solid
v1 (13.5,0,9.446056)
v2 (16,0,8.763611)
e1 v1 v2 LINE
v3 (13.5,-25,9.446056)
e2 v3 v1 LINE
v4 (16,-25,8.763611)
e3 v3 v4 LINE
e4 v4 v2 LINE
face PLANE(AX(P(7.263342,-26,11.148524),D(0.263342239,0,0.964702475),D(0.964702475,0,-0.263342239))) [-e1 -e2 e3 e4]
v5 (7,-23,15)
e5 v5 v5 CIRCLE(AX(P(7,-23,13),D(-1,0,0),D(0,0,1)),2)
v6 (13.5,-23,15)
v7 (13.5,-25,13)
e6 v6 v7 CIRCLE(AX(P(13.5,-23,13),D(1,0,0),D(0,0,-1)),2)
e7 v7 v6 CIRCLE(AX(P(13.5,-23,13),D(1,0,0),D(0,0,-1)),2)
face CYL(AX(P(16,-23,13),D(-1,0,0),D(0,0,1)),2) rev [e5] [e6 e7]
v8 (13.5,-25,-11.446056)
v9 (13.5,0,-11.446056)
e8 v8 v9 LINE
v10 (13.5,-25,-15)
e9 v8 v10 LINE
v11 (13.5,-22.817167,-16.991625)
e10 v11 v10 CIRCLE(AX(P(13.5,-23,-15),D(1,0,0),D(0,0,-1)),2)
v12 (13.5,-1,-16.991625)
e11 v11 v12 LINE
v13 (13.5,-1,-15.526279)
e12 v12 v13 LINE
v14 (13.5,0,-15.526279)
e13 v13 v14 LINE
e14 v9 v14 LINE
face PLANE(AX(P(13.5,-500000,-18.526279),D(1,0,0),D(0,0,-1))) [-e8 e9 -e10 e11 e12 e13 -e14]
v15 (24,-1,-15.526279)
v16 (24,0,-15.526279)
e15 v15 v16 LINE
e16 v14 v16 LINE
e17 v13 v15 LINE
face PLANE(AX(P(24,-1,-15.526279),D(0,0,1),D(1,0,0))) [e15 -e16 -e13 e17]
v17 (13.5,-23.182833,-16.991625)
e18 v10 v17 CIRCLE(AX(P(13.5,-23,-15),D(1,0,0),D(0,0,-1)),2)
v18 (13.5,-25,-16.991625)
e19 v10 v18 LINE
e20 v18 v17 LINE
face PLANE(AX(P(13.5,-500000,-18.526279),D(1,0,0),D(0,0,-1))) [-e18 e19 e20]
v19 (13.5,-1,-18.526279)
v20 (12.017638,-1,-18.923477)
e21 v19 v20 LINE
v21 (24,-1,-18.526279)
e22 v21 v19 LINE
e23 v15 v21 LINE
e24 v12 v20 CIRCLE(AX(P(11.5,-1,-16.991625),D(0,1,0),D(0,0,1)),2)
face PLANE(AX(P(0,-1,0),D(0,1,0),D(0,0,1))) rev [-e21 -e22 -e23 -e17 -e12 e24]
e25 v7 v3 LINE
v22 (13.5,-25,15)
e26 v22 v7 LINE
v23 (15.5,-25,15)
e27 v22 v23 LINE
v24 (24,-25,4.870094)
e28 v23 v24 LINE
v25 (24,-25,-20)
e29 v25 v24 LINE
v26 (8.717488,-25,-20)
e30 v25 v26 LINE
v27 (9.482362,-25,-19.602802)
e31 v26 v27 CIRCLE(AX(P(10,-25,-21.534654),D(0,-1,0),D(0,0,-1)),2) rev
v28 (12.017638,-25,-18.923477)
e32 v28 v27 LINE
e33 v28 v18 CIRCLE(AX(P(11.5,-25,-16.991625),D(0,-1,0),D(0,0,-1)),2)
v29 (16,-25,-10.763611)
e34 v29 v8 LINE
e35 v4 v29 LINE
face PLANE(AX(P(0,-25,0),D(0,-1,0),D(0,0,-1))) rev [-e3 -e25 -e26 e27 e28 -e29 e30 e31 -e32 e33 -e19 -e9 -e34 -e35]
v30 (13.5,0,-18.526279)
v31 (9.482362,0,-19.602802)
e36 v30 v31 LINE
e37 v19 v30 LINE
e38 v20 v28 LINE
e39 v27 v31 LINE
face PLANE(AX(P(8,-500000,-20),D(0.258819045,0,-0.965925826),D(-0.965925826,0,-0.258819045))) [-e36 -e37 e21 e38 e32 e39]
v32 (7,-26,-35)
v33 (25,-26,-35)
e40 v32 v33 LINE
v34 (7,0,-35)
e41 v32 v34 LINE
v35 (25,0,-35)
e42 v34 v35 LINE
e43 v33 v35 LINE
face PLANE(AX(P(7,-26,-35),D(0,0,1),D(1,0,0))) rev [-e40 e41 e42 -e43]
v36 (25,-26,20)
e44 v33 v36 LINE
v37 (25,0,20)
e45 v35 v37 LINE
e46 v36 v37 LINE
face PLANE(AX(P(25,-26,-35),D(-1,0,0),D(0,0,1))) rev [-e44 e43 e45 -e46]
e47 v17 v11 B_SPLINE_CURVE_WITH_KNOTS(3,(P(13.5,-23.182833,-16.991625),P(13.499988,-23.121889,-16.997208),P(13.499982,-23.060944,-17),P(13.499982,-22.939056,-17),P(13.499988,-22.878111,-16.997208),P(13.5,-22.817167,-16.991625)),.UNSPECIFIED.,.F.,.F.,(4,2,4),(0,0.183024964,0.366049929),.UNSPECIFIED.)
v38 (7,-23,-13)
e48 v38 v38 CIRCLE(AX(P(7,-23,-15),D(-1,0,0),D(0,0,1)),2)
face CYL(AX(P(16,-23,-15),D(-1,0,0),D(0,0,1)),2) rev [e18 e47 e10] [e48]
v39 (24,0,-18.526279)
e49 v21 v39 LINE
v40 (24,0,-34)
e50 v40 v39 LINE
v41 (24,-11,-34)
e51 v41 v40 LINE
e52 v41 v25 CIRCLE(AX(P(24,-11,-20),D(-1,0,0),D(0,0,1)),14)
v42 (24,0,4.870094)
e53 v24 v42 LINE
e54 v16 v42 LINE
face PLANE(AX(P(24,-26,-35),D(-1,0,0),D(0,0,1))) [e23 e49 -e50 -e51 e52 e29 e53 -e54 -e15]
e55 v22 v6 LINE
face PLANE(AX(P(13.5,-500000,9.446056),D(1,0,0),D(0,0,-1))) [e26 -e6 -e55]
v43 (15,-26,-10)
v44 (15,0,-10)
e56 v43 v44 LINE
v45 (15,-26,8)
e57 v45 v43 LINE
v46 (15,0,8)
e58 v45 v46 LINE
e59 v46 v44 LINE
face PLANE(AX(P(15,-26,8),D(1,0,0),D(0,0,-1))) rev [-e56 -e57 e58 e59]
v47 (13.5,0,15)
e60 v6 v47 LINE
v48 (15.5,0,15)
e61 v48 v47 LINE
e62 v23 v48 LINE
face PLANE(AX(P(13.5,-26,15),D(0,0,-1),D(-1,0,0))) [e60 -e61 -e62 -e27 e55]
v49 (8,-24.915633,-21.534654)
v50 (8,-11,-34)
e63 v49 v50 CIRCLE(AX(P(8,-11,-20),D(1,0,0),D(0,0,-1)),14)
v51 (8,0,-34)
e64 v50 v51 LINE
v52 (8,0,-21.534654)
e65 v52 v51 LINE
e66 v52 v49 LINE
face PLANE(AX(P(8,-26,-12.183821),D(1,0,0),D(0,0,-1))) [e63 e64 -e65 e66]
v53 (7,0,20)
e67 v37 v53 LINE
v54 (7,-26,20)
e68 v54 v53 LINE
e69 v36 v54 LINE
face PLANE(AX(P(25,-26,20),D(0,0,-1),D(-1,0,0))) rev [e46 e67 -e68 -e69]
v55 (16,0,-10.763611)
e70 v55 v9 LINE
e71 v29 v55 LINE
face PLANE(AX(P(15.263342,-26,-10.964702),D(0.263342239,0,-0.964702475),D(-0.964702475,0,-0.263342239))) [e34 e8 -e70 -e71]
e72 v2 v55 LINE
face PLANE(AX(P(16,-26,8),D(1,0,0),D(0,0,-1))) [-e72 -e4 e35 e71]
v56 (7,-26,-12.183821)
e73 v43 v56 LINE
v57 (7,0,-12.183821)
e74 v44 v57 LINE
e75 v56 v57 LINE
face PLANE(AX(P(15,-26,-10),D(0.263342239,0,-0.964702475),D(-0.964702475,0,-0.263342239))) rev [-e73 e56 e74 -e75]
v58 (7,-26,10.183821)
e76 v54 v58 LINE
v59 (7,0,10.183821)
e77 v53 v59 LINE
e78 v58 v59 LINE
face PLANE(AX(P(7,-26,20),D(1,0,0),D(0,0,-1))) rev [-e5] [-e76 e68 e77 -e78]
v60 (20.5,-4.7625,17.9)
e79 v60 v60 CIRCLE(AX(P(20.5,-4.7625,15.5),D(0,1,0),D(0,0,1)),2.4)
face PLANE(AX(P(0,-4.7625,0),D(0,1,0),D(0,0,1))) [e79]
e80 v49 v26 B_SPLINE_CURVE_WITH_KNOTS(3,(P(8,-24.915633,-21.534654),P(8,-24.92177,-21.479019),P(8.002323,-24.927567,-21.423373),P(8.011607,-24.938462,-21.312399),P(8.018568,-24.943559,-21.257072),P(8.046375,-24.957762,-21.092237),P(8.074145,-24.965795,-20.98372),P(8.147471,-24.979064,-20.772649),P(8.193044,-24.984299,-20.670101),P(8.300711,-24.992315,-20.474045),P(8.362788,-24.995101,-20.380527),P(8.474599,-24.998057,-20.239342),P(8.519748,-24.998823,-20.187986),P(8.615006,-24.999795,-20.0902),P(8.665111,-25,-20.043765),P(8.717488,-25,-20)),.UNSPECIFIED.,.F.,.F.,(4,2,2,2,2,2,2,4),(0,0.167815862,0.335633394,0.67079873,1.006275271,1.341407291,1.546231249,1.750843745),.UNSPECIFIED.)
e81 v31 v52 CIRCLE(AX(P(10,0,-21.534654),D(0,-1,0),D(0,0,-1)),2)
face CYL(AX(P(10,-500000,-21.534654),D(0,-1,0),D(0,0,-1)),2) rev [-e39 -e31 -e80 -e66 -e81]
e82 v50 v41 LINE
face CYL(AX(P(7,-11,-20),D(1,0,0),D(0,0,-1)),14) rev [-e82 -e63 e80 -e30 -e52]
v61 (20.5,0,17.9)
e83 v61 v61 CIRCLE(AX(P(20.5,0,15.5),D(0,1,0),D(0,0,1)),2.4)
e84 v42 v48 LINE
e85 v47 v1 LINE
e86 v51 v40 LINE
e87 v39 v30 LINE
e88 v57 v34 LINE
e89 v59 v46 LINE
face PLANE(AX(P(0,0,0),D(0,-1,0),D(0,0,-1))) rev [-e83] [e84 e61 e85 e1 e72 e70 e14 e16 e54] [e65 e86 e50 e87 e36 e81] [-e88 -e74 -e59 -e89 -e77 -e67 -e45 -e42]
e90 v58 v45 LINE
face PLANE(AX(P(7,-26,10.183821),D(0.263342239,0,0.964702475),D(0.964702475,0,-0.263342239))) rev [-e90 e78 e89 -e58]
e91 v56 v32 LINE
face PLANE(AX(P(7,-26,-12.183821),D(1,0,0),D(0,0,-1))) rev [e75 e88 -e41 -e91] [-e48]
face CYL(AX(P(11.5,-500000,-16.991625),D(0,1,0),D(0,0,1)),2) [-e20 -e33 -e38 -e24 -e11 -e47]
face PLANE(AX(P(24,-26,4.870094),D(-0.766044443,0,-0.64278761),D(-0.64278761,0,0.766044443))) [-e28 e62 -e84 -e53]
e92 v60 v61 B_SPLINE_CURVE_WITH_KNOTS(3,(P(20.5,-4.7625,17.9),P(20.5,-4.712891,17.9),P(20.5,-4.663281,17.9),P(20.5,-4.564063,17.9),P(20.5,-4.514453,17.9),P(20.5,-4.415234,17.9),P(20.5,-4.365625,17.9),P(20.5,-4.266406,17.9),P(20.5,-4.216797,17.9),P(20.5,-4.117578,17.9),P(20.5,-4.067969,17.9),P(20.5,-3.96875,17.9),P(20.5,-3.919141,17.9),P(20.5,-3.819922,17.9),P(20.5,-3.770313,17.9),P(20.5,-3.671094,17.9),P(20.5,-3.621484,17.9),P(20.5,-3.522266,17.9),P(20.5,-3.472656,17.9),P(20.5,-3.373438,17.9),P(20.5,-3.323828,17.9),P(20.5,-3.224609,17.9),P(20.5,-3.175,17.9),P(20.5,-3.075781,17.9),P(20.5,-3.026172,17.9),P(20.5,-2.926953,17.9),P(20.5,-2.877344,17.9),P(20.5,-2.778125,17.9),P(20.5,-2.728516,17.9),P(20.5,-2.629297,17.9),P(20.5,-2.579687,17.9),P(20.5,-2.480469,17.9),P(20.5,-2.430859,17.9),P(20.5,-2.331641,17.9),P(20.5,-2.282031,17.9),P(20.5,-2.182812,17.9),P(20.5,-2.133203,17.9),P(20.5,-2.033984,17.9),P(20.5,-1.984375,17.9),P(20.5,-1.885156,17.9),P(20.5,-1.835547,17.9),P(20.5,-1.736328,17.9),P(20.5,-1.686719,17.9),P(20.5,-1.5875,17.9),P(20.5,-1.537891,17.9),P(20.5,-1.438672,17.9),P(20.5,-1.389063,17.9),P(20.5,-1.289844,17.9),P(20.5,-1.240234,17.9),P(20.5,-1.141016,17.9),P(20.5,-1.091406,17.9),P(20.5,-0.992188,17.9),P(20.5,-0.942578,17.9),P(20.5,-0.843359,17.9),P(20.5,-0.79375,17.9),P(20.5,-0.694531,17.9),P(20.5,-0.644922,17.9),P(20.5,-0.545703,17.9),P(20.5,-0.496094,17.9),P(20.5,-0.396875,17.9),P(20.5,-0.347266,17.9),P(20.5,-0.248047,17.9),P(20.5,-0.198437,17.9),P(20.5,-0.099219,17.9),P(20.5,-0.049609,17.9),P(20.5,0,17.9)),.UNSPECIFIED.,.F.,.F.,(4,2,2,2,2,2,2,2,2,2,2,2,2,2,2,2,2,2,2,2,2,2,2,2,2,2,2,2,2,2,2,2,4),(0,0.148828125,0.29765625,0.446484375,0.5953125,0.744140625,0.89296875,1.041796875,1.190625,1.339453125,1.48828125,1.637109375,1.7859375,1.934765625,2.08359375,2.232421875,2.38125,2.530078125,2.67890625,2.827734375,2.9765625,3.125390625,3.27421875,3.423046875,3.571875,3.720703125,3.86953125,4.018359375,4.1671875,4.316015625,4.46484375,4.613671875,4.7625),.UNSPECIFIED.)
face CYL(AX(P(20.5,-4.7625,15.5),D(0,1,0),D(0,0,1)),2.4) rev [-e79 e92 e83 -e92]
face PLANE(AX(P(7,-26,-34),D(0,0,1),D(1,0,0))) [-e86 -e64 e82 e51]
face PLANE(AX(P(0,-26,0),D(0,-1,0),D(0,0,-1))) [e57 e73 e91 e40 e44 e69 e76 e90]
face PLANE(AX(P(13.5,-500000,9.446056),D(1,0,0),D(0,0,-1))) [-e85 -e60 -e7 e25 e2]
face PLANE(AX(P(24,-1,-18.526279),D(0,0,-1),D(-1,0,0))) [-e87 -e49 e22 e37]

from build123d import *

# Parameters (mm, degrees)
BOSS_EXTRUDE2_DEPTH = 26
SHELL1_T            = -1
FILLET1_R           = 14
BOSS_EXTRUDE3_REACH = 52.259
FILLET2_R           = 14
SKETCH8_W           = 10.5
SKETCH8_H           = 3
BOSS_EXTRUDE4_DEPTH = 1
SKETCH4_R           = 2
CUT_EXTRUDE1_DEPTH  = 9
BOSS_EXTRUDE5_REACH = 52.259
SKETCH7_R           = 2.4
CUT_EXTRUDE2_DEPTH  = 4.7625
FILLET5_R           = 2


with BuildPart() as part:
    # Sketch2 → Boss-Extrude2 (new body)
    with BuildSketch(Plane.XZ):
        Polygon((7, -12.183821406), (7, -35), (25, -35), (25, 20), (7, 20), (7, 10.183821406), (15, 8), (15, -10), align=None)
    extrude(amount=BOSS_EXTRUDE2_DEPTH)

    # Shell1
    shell1_openings = [part.faces().sort_by_distance(p)[0] for p in [
        (17.00255576, 0, -8.766773004),
    ]]
    offset(amount=SHELL1_T, openings=shell1_openings, kind=Kind.INTERSECTION)

    # Fillet1
    fillet1_edges = [part.edges().sort_by_distance(p)[0] for p in [
        (16, -25, -34),
    ]]
    fillet(fillet1_edges, radius=FILLET1_R)

    # Sketch3 → Boss-Extrude3 (add, up to next)
    with BuildSketch(Plane(origin=(0, 0, 0), x_dir=(1, 0, 0), z_dir=(0, 1, 0)), mode=Mode.PRIVATE) as boss_extrude3_sk1:
        Polygon((13.5, 11.446055541), (8, 12.947432757), (8, 20), (13.5, 18.526279442), align=None)
    boss_extrude3_tool1 = extrude(boss_extrude3_sk1.sketch, amount=-BOSS_EXTRUDE3_REACH, mode=Mode.PRIVATE) - part.part
    # Sketch3 → Boss-Extrude3 (add, up to next)
    with BuildSketch(Plane(origin=(0, 0, 0), x_dir=(1, 0, 0), z_dir=(0, 1, 0)), mode=Mode.PRIVATE) as boss_extrude3_sk2:
        Polygon((13.5, -9.446055541), (8, -10.947432757), (8, -19), (13.5, -19), align=None)
    boss_extrude3_tool2 = extrude(boss_extrude3_sk2.sketch, amount=-BOSS_EXTRUDE3_REACH, mode=Mode.PRIVATE) - part.part
    add(boss_extrude3_tool1.solids().sort_by_distance((10.751794, 0, -15.729457))[0])
    add(boss_extrude3_tool2.solids().sort_by_distance((10.828168, 0, 14.587703))[0])

    # Fillet2
    # the kernel refuses this fillet: 14 mm, written as the material it adds along each edge
    with BuildSketch(Plane(origin=(24, 0, 19), x_dir=(0, 0, -1), z_dir=(0, -1, 0))) as fillet2_piece_1:
        with BuildLine():
            CenterArc((13.555441712, -14), FILLET2_R, 90, 75.522487814)
            Line((0, -10.5), (-0.271108834, -10.43))
            ThreePointArc((-0.271108834, -10.43), (-0.28, -5.25), (-0.28, 0))
            Line((-0.28, 0), (0, 0.28))
            Line((0, 0.28), (13.555441712, 0.28))
            Line((13.555441712, 0.28), (13.555441712, 0))
        make_face()
    extrude(amount=25)

    # Sketch8 → Boss-Extrude4 (add)
    with BuildSketch(Plane(origin=(0, 0, 0), x_dir=(1, 0, 0), z_dir=(0, 1, 0))):
        with Locations((18.75, 17.026279442)):
            Rectangle(SKETCH8_W, SKETCH8_H)
    extrude(amount=-BOSS_EXTRUDE4_DEPTH)

    # Sketch4 → Cut-Extrude1 (cut)
    with BuildSketch(Plane.ZY.offset(-7)):
        with Locations((-15, -23)):
            Circle(SKETCH4_R)
        with Locations((13, -23)):
            Circle(SKETCH4_R)
    extrude(amount=-CUT_EXTRUDE1_DEPTH, mode=Mode.SUBTRACT)

    # Sketch9 → Boss-Extrude5 (add, up to next)
    with BuildSketch(Plane(origin=(0, 0, 0), x_dir=(1, 0, 0), z_dir=(0, 1, 0)), mode=Mode.PRIVATE) as boss_extrude5_sk1:
        with BuildLine():
            Line((13.5, -15), (15.5, -15))
            Line((15.5, -15), (24, -4.870094463))
            Line((24, -4.870094463), (24, -5.444558288))
            ThreePointArc((24, -5.444558288), (21.067971811, -14.017772388), (13.5, -19))
            Line((13.5, -19), (13.5, -15))
        make_face()
    boss_extrude5_tool1 = extrude(boss_extrude5_sk1.sketch, amount=-BOSS_EXTRUDE5_REACH, mode=Mode.PRIVATE) - part.part
    add(boss_extrude5_tool1.solids().sort_by_distance((18.990726, 0, 13.031002))[0])

    # Sketch7 → Cut-Extrude2 (cut)
    with BuildSketch(Plane(origin=(0, 0, 0), x_dir=(1, 0, 0), z_dir=(0, 1, 0))):
        with Locations(Location((20.5, -15.5, 0), (0, 0, 270))):
            Circle(SKETCH7_R)
    extrude(amount=-CUT_EXTRUDE2_DEPTH, mode=Mode.SUBTRACT)

    # Fillet5
    fillet5_edges = [part.edges().sort_by_distance(p)[0] for p in [
        (8, -12.5, -20),
        (13.5, -13, -18.526279442),
    ]]
    fillet(fillet5_edges, radius=FILLET5_R)


solid = part.part
